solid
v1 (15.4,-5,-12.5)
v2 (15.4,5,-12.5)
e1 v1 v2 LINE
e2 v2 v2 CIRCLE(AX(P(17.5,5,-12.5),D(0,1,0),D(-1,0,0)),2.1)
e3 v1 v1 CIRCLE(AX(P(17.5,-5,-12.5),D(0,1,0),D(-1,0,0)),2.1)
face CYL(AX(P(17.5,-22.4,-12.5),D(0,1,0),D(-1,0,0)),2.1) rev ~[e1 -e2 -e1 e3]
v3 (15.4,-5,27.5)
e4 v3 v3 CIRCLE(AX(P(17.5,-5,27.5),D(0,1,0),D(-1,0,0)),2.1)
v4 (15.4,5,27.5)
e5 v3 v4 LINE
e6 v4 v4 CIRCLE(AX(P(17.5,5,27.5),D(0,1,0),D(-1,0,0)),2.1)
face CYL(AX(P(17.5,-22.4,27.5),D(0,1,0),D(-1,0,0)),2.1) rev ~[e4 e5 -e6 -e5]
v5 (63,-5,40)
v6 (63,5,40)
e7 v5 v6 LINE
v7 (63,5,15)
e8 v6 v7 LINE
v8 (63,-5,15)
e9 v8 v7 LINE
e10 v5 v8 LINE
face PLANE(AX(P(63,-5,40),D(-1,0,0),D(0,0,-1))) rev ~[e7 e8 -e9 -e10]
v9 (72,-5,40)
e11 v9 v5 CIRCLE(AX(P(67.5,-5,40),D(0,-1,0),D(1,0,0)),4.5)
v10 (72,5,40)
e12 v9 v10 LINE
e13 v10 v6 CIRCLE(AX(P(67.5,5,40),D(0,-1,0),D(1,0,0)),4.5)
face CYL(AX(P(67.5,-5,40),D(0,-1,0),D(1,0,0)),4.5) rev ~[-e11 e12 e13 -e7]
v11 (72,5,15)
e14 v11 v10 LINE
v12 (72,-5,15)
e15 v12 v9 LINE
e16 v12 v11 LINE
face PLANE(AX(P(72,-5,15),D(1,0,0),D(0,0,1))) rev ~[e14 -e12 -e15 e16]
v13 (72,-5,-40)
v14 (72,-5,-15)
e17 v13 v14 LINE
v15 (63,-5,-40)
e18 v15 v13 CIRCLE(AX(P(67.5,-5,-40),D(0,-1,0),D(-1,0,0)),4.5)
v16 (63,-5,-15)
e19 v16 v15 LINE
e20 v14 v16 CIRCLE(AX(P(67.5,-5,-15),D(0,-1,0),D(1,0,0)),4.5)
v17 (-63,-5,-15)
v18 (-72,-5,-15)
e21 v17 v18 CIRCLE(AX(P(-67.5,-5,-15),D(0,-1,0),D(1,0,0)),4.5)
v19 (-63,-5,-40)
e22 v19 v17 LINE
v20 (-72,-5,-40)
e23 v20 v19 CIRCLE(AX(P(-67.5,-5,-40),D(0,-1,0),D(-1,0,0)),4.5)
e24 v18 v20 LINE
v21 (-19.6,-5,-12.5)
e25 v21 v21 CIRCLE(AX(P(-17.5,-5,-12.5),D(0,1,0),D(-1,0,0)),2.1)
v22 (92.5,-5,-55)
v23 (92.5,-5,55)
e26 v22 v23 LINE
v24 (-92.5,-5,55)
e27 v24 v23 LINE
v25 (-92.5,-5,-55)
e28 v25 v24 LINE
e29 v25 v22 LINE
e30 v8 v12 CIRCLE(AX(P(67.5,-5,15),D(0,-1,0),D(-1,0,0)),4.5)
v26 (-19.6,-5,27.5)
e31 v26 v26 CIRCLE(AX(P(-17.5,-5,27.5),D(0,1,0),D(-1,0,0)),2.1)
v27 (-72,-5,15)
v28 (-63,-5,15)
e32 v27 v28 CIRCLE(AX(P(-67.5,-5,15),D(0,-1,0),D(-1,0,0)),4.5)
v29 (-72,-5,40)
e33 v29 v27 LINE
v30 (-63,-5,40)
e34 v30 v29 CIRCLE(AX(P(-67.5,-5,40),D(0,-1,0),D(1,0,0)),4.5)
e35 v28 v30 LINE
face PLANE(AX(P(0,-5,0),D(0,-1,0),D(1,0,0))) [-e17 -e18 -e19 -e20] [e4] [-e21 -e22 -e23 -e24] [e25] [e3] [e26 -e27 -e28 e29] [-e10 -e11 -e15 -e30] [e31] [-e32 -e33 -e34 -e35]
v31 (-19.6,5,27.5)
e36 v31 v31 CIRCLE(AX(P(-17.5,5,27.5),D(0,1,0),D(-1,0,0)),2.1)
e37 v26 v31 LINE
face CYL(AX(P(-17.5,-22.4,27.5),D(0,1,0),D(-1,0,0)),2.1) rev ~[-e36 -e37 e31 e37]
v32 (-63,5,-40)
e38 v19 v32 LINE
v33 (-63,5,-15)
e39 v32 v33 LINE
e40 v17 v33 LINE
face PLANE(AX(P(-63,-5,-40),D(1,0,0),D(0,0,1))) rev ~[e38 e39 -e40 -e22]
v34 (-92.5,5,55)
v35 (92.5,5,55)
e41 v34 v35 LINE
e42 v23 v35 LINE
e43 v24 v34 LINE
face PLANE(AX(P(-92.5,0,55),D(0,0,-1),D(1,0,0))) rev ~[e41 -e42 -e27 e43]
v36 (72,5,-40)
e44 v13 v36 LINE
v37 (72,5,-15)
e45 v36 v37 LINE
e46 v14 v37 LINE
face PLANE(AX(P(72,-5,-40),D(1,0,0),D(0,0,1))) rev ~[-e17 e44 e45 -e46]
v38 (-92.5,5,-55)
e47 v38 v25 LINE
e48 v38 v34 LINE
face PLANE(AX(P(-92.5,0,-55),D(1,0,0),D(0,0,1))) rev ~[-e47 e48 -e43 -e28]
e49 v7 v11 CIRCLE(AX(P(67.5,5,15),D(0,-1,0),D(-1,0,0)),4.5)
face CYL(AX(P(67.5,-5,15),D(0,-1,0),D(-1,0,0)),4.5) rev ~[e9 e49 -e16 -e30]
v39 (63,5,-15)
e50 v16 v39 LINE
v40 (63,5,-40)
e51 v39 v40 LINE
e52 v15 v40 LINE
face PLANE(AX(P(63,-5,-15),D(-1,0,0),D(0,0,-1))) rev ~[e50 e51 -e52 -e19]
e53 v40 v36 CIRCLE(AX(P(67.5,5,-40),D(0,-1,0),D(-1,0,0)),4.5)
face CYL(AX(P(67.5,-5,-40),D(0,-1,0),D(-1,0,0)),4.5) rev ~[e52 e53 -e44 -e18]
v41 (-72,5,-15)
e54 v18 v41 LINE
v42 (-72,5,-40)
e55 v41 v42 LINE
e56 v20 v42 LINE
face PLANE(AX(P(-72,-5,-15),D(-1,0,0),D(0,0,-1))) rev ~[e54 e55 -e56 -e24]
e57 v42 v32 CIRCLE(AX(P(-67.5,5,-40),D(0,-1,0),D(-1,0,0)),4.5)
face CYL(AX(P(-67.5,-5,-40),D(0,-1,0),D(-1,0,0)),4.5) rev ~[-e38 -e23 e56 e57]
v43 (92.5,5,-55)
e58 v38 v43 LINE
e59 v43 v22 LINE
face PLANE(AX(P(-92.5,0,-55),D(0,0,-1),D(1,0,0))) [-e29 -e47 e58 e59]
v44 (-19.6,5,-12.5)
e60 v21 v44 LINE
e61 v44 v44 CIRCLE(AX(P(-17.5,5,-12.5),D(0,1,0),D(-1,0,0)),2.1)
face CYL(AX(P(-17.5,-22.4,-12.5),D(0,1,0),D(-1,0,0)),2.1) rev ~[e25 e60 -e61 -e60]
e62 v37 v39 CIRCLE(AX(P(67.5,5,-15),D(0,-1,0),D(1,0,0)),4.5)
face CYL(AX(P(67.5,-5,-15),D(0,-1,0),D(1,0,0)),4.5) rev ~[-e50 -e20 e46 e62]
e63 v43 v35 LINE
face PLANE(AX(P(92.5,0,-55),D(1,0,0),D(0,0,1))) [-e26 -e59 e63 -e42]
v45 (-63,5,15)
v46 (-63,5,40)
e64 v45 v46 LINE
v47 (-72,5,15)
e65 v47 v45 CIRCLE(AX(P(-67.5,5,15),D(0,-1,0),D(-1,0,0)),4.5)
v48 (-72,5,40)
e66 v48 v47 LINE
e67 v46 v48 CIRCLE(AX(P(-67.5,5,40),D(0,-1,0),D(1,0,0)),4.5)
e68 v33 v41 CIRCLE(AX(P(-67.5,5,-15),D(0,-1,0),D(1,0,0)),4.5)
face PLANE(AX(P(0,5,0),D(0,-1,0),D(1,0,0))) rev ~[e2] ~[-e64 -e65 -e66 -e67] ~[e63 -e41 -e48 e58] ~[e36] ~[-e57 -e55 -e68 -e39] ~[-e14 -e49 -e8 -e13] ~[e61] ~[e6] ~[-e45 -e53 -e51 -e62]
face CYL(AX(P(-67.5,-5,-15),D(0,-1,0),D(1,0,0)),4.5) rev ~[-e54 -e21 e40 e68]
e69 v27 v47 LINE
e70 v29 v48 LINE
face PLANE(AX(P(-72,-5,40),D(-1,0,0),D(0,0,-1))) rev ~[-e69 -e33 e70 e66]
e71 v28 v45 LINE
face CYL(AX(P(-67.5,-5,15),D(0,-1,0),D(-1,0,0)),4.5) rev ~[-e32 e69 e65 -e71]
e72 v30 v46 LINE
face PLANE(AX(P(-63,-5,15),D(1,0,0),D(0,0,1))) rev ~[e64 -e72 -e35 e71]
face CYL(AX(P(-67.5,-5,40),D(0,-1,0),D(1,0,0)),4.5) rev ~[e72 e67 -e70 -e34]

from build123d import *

# Parameters (mm, degrees)
F0_W     = 185
F0_H     = 110
F1_DEPTH = 5
F3_DEPTH = 10.001
F5_D     = 4.2
F5_DEPTH = 17.4
F5_TIP   = 1.2618073


with BuildPart() as f1:
    # F0 (on Front) → F1 (new body, symmetric)
    with BuildSketch(Plane.XZ):
        Rectangle(F0_W, F0_H)
    extrude(amount=F1_DEPTH, both=True)

    # F2 (on face) → F3 (cut, through all)
    with BuildSketch(Plane.XZ.offset(5)):
        with BuildLine():
            ThreePointArc((-63, 40), (-67.5, 44.5), (-72, 40))
            Line((-72, 40), (-72, 15))
            ThreePointArc((-72, 15), (-67.5, 10.5), (-63, 15))
            Line((-63, 15), (-63, 40))
        make_face()
        with BuildLine():
            ThreePointArc((-63, -15), (-67.5, -10.5), (-72, -15))
            Line((-72, -15), (-72, -40))
            ThreePointArc((-72, -40), (-67.5, -44.5), (-63, -40))
            Line((-63, -40), (-63, -15))
        make_face()
        with BuildLine():
            ThreePointArc((72, 40), (67.5, 44.5), (63, 40))
            Line((63, 40), (63, 15))
            ThreePointArc((63, 15), (67.5, 10.5), (72, 15))
            Line((72, 15), (72, 40))
        make_face()
        with BuildLine():
            ThreePointArc((72, -15), (67.5, -10.5), (63, -15))
            Line((63, -15), (63, -40))
            ThreePointArc((63, -40), (67.5, -44.5), (72, -40))
            Line((72, -40), (72, -15))
        make_face()
    extrude(amount=-F3_DEPTH, mode=Mode.SUBTRACT)

    # F5
    with Locations(Plane.XZ.offset(5)):
        with Locations((-17.5, 27.5), (-17.5, -12.5), (17.5, 27.5), (17.5, -12.5)):
            Hole(F5_D / 2, depth=F5_DEPTH)
            with Locations((0, 0, -(F5_DEPTH + F5_TIP / 2))):  # 118° drill point
                Cone(0, F5_D / 2, F5_TIP, mode=Mode.SUBTRACT)


solid = f1.part
